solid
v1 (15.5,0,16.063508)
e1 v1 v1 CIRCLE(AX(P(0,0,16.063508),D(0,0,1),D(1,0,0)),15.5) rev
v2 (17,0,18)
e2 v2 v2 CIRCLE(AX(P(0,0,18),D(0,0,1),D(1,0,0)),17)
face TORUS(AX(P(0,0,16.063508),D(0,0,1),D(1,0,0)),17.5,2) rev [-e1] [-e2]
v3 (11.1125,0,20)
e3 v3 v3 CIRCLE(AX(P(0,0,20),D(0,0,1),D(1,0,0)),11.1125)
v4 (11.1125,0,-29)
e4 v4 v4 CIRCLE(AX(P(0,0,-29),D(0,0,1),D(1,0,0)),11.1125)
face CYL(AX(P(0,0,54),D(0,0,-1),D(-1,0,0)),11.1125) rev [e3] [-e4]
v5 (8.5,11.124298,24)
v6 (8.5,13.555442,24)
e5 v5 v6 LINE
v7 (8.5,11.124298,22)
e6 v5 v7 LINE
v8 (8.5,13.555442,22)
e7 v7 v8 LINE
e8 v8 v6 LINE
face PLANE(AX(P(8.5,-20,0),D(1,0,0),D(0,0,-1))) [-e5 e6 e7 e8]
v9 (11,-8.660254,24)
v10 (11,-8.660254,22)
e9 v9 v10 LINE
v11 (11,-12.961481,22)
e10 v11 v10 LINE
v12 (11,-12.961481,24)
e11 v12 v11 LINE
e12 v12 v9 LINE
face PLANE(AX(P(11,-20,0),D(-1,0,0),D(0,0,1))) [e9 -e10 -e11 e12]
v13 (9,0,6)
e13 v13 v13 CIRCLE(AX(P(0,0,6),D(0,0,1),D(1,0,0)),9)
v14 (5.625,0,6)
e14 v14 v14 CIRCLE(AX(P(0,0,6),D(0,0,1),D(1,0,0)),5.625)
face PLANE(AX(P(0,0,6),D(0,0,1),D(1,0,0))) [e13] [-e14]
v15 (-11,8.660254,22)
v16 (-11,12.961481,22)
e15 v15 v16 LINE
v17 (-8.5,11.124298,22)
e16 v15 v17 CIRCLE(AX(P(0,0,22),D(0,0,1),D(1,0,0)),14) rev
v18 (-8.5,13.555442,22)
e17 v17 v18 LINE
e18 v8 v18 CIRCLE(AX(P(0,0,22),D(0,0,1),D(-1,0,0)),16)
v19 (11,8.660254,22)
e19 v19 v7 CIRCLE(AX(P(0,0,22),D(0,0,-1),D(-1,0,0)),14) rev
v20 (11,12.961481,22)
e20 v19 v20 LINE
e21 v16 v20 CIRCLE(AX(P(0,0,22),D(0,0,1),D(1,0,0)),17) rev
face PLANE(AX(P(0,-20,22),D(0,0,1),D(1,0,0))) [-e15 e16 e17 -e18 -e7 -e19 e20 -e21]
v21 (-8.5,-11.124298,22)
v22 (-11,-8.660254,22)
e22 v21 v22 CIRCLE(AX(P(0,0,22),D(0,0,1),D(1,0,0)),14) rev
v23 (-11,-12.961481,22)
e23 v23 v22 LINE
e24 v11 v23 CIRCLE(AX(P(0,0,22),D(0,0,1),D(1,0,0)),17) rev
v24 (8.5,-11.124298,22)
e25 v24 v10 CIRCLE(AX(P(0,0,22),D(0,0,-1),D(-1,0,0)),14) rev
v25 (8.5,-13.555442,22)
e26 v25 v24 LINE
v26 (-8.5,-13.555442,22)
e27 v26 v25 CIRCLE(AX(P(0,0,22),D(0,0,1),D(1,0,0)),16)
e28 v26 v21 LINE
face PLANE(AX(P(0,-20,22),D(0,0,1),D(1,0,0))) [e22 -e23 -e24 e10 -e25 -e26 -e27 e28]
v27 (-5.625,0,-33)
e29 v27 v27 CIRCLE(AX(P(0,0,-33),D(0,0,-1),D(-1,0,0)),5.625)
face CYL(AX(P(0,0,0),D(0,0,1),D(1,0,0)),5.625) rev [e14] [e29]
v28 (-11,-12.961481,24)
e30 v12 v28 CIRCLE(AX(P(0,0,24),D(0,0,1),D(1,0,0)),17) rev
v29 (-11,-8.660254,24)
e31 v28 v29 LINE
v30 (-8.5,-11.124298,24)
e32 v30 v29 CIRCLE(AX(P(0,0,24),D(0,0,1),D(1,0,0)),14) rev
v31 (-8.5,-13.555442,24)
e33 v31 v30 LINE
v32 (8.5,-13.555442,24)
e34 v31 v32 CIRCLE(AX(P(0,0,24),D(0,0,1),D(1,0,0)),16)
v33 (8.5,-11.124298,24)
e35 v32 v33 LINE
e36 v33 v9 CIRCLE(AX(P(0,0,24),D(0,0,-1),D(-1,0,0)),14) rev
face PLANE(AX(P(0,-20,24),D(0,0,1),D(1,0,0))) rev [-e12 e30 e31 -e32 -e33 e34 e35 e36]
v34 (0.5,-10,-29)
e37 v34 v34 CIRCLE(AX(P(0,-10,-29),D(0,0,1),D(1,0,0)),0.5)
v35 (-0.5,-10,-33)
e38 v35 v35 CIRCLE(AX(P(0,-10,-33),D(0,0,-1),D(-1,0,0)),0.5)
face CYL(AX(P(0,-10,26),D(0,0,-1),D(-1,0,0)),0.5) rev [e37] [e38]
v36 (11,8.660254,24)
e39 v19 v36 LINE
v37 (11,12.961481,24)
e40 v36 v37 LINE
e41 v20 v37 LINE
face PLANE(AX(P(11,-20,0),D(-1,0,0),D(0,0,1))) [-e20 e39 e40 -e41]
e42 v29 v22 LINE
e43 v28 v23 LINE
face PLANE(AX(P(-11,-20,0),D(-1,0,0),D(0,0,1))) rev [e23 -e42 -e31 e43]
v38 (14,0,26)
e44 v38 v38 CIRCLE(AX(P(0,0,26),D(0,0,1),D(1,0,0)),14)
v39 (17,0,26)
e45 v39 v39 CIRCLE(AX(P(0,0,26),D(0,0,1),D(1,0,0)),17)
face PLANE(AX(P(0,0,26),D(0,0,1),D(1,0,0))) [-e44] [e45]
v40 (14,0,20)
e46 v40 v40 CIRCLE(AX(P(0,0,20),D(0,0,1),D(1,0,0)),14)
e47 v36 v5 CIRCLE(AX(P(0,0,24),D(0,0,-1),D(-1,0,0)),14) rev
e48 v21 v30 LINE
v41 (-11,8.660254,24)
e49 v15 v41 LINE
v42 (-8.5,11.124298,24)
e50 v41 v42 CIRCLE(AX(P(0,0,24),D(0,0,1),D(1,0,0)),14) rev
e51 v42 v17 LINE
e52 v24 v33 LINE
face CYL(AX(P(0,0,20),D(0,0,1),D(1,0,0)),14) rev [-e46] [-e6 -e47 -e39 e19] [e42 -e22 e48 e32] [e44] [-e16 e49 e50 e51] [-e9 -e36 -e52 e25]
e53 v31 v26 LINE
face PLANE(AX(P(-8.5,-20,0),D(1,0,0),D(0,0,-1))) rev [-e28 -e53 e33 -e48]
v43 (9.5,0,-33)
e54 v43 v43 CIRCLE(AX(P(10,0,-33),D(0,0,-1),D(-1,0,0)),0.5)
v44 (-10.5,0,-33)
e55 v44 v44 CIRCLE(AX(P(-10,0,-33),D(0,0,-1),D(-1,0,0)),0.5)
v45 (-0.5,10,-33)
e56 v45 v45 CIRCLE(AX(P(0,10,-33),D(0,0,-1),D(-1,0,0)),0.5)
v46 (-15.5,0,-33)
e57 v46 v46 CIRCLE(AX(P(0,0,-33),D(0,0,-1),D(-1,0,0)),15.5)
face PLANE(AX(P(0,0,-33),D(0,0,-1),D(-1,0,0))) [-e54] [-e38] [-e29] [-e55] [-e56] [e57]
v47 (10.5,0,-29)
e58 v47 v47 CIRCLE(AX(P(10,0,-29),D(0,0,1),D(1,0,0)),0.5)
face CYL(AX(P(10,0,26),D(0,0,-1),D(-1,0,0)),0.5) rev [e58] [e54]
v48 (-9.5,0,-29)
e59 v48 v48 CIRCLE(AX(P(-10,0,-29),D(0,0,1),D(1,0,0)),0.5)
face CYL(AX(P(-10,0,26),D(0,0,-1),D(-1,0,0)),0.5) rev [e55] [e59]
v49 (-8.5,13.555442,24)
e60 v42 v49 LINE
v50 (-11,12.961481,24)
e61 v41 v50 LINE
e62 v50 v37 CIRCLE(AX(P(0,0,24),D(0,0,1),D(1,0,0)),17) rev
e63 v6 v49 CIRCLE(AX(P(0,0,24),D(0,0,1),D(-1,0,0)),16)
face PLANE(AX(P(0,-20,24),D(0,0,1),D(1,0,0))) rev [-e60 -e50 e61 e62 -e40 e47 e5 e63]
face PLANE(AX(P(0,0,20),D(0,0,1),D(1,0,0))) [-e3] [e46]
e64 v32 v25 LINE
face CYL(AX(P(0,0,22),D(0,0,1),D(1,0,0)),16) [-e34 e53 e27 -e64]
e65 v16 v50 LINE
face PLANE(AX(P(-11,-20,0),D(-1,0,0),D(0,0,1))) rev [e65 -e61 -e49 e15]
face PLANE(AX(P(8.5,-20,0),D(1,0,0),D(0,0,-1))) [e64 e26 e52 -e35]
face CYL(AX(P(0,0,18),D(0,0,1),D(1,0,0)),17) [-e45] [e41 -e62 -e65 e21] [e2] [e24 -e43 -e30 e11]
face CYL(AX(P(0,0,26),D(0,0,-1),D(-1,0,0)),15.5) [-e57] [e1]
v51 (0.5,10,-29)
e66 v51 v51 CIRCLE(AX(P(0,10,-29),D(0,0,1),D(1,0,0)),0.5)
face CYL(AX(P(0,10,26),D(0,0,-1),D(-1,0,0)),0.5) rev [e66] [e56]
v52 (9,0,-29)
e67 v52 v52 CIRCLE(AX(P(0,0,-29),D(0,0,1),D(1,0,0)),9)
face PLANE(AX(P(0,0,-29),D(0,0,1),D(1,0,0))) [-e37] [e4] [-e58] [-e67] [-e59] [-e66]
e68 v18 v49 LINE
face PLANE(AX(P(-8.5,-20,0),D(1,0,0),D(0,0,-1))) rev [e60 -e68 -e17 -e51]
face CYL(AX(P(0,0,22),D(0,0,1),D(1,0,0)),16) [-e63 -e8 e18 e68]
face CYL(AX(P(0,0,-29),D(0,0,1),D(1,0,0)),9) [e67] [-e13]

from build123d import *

# Parameters (mm, degrees)
SKETCH1_R                = 15.5
BOSS_EXTRUDE5_DEPTH      = 26
SKETCH3_R                = 5.625
CUT_EXTRUDE2_DEPTH       = 35.007352146
CUT_EXTRUDE3_DEPTH       = 28
CUT_EXTRUDE3_DEPTH_BACK  = 20
SKETCH4_R                = 11.1125
CUT_EXTRUDE6_START       = 6
SKETCH7_R                = 11
SKETCH7_R_2              = 9
CUT_EXTRUDE6_DEPTH       = 2
BOSS_EXTRUDE8_DEPTH      = 6
BOSS_EXTRUDE8_DEPTH_BACK = 2
BOSS_EXTRUDE8_START      = 20
SKETCH12_R               = 17
CUT_EXTRUDE10_START      = 18
SKETCH13_R               = 11
CUT_EXTRUDE10_DEPTH      = 18.411862419
FILLET2_R                = 2
CUT_EXTRUDE11_START      = 26
SKETCH14_R               = 14
CUT_EXTRUDE11_DEPTH      = 6
SKETCH15_R               = 0.5
CUT_EXTRUDE14_DEPTH      = 36.411862419
SKETCH18_W               = 2.5
SKETCH18_H               = 2
CUT_EXTRUDE15_DEPTH      = 20
CUT_EXTRUDE16_DEPTH      = 2
BOSS_EXTRUDE9_START      = 33
SKETCH26_R               = 15.5
SKETCH26_R_2             = 5.625
SKETCH26_R_3             = 0.5
BOSS_EXTRUDE9_DEPTH      = 33
SKETCH27_R               = 11.1125
CUT_EXTRUDE17_DEPTH      = 33
BOSS_EXTRUDE10_START     = -35
SKETCH24_R               = 9
SKETCH24_R_2             = 5.625
BOSS_EXTRUDE10_DEPTH     = 35


with BuildPart() as part:
    # Sketch1 → Boss-Extrude5 (new body)
    with BuildSketch(Plane.XY):
        Circle(SKETCH1_R)
    extrude(amount=BOSS_EXTRUDE5_DEPTH)

    # Sketch3 → Cut-Extrude2 (cut, through all)
    with BuildSketch(Plane.XY.offset(26)):
        Circle(SKETCH3_R)
    extrude(amount=-CUT_EXTRUDE2_DEPTH, mode=Mode.SUBTRACT)

    # Sketch4 → Cut-Extrude3 (cut, two sides: drawn at the far end of the back side and taken through both)
    with BuildSketch(Plane.XY.offset(26).offset(-CUT_EXTRUDE3_DEPTH_BACK)):
        Circle(SKETCH4_R)
    extrude(amount=CUT_EXTRUDE3_DEPTH + CUT_EXTRUDE3_DEPTH_BACK, mode=Mode.SUBTRACT)

    # Sketch7 → Cut-Extrude6 (cut)
    with BuildSketch(Plane.XY.offset(CUT_EXTRUDE6_START)):
        Circle(SKETCH7_R)
        Circle(SKETCH7_R_2, mode=Mode.SUBTRACT)
    extrude(amount=-CUT_EXTRUDE6_DEPTH, mode=Mode.SUBTRACT)

    # Sketch12 → Boss-Extrude8 (add, two sides: drawn at the far end of the back side and taken through both)
    with BuildSketch(Plane.XY.offset(BOSS_EXTRUDE8_START - BOSS_EXTRUDE8_DEPTH_BACK)):
        Circle(SKETCH12_R)
    extrude(amount=BOSS_EXTRUDE8_DEPTH + BOSS_EXTRUDE8_DEPTH_BACK)

    # Sketch13 → Cut-Extrude10 (cut, through all)
    with BuildSketch(Plane.XY.offset(CUT_EXTRUDE10_START)):
        Circle(SKETCH13_R)
    extrude(amount=CUT_EXTRUDE10_DEPTH, mode=Mode.SUBTRACT)

    # Fillet2
    # the kernel refuses this fillet: 2 mm, written as the material it adds along each edge
    with BuildSketch(Plane(origin=(0, 0, 18), x_dir=(1, 0, 0), z_dir=(0, 1, 0))) as fillet2_piece_1:
        with BuildLine():
            CenterArc((17.5, 1.936491673), FILLET2_R, 180, 75.522487814)
            Line((17, 0), (16.99, -0.038729833))
            ThreePointArc((16.99, -0.038729833), (16.25, -0.04), (15.5, -0.04))
            Line((15.5, -0.04), (15.46, 0))
            Line((15.46, 0), (15.46, 1.936491673))
            Line((15.46, 1.936491673), (15.5, 1.936491673))
        make_face()
    revolve(axis=Axis((0, 0, 18), (0, 0, -1)))

    # Sketch14 → Cut-Extrude11 (cut)
    with BuildSketch(Plane.XY.offset(CUT_EXTRUDE11_START)):
        Circle(SKETCH14_R)
    extrude(amount=-CUT_EXTRUDE11_DEPTH, mode=Mode.SUBTRACT)

    # Sketch15 → Cut-Extrude14 (cut, through all)
    with BuildSketch(Plane.XY):
        with Locations((0, 10)):
            Circle(SKETCH15_R)
        with Locations((0, -10)):
            Circle(SKETCH15_R)
        with Locations((10, 0)):
            Circle(SKETCH15_R)
        with Locations((-10, 0)):
            Circle(SKETCH15_R)
    extrude(amount=CUT_EXTRUDE14_DEPTH, mode=Mode.SUBTRACT)

    # Sketch18 → Cut-Extrude15 (cut, symmetric)
    with BuildSketch(Plane(origin=(0, 0, 0), x_dir=(1, 0, 0), z_dir=(0, 1, 0))):
        with Locations((-9.75, -23)):
            Rectangle(SKETCH18_W, SKETCH18_H)
        with Locations((9.75, -23)):
            Rectangle(SKETCH18_W, SKETCH18_H)
    extrude(amount=CUT_EXTRUDE15_DEPTH, both=True, mode=Mode.SUBTRACT)

    # Sketch23 → Cut-Extrude16 (cut)
    with BuildSketch(Plane(origin=(0, 0, 24), x_dir=(-1, 0, 0), z_dir=(0, 0, -1))):
        with BuildLine():
            Line((9.719197711, 13.947659153), (9.147480199, 13.127208615))
            ThreePointArc((9.147480199, 13.127208615), (0, 16), (-9.147480199, 13.127208615))
            Line((-9.147480199, 13.127208615), (-9.719197711, 13.947659153))
            ThreePointArc((-9.719197711, 13.947659153), (0, 17), (9.719197711, 13.947659153))
        make_face()
        with BuildLine():
            Line((-9.147480199, -13.127208615), (-9.719197711, -13.947659153))
            ThreePointArc((-9.719197711, -13.947659153), (0, -17), (9.719197711, -13.947659153))
            Line((9.719197711, -13.947659153), (9.147480199, -13.127208615))
            ThreePointArc((9.147480199, -13.127208615), (0, -16), (-9.147480199, -13.127208615))
        make_face()
    extrude(amount=CUT_EXTRUDE16_DEPTH, mode=Mode.SUBTRACT)

    # Sketch26 → Boss-Extrude9 (add)
    with BuildSketch(Plane(origin=(0, 0, 0), x_dir=(-1, 0, 0), z_dir=(0, 0, -1)).offset(BOSS_EXTRUDE9_START)):
        Circle(SKETCH26_R)
        with Locations(Location((0, 0, 0), (0, 0, 180))):
            Circle(SKETCH26_R_2, mode=Mode.SUBTRACT)
        with Locations((-10, 0)):
            Circle(SKETCH26_R_3, mode=Mode.SUBTRACT)
        with Locations((0, 10)):
            Circle(SKETCH26_R_3, mode=Mode.SUBTRACT)
        with Locations((10, 0)):
            Circle(SKETCH26_R_3, mode=Mode.SUBTRACT)
        with Locations((0, -10)):
            Circle(SKETCH26_R_3, mode=Mode.SUBTRACT)
    extrude(amount=-BOSS_EXTRUDE9_DEPTH)

    # Sketch27 → Cut-Extrude17 (cut, symmetric)
    with BuildSketch(Plane.XY.offset(4)):
        Circle(SKETCH27_R)
    extrude(amount=CUT_EXTRUDE17_DEPTH, both=True, mode=Mode.SUBTRACT)

    # Sketch24 → Boss-Extrude10 (add)
    with BuildSketch(Plane.XY.offset(6).offset(BOSS_EXTRUDE10_START)):
        Circle(SKETCH24_R)
        Circle(SKETCH24_R_2, mode=Mode.SUBTRACT)
    extrude(amount=BOSS_EXTRUDE10_DEPTH)


solid = part.part
